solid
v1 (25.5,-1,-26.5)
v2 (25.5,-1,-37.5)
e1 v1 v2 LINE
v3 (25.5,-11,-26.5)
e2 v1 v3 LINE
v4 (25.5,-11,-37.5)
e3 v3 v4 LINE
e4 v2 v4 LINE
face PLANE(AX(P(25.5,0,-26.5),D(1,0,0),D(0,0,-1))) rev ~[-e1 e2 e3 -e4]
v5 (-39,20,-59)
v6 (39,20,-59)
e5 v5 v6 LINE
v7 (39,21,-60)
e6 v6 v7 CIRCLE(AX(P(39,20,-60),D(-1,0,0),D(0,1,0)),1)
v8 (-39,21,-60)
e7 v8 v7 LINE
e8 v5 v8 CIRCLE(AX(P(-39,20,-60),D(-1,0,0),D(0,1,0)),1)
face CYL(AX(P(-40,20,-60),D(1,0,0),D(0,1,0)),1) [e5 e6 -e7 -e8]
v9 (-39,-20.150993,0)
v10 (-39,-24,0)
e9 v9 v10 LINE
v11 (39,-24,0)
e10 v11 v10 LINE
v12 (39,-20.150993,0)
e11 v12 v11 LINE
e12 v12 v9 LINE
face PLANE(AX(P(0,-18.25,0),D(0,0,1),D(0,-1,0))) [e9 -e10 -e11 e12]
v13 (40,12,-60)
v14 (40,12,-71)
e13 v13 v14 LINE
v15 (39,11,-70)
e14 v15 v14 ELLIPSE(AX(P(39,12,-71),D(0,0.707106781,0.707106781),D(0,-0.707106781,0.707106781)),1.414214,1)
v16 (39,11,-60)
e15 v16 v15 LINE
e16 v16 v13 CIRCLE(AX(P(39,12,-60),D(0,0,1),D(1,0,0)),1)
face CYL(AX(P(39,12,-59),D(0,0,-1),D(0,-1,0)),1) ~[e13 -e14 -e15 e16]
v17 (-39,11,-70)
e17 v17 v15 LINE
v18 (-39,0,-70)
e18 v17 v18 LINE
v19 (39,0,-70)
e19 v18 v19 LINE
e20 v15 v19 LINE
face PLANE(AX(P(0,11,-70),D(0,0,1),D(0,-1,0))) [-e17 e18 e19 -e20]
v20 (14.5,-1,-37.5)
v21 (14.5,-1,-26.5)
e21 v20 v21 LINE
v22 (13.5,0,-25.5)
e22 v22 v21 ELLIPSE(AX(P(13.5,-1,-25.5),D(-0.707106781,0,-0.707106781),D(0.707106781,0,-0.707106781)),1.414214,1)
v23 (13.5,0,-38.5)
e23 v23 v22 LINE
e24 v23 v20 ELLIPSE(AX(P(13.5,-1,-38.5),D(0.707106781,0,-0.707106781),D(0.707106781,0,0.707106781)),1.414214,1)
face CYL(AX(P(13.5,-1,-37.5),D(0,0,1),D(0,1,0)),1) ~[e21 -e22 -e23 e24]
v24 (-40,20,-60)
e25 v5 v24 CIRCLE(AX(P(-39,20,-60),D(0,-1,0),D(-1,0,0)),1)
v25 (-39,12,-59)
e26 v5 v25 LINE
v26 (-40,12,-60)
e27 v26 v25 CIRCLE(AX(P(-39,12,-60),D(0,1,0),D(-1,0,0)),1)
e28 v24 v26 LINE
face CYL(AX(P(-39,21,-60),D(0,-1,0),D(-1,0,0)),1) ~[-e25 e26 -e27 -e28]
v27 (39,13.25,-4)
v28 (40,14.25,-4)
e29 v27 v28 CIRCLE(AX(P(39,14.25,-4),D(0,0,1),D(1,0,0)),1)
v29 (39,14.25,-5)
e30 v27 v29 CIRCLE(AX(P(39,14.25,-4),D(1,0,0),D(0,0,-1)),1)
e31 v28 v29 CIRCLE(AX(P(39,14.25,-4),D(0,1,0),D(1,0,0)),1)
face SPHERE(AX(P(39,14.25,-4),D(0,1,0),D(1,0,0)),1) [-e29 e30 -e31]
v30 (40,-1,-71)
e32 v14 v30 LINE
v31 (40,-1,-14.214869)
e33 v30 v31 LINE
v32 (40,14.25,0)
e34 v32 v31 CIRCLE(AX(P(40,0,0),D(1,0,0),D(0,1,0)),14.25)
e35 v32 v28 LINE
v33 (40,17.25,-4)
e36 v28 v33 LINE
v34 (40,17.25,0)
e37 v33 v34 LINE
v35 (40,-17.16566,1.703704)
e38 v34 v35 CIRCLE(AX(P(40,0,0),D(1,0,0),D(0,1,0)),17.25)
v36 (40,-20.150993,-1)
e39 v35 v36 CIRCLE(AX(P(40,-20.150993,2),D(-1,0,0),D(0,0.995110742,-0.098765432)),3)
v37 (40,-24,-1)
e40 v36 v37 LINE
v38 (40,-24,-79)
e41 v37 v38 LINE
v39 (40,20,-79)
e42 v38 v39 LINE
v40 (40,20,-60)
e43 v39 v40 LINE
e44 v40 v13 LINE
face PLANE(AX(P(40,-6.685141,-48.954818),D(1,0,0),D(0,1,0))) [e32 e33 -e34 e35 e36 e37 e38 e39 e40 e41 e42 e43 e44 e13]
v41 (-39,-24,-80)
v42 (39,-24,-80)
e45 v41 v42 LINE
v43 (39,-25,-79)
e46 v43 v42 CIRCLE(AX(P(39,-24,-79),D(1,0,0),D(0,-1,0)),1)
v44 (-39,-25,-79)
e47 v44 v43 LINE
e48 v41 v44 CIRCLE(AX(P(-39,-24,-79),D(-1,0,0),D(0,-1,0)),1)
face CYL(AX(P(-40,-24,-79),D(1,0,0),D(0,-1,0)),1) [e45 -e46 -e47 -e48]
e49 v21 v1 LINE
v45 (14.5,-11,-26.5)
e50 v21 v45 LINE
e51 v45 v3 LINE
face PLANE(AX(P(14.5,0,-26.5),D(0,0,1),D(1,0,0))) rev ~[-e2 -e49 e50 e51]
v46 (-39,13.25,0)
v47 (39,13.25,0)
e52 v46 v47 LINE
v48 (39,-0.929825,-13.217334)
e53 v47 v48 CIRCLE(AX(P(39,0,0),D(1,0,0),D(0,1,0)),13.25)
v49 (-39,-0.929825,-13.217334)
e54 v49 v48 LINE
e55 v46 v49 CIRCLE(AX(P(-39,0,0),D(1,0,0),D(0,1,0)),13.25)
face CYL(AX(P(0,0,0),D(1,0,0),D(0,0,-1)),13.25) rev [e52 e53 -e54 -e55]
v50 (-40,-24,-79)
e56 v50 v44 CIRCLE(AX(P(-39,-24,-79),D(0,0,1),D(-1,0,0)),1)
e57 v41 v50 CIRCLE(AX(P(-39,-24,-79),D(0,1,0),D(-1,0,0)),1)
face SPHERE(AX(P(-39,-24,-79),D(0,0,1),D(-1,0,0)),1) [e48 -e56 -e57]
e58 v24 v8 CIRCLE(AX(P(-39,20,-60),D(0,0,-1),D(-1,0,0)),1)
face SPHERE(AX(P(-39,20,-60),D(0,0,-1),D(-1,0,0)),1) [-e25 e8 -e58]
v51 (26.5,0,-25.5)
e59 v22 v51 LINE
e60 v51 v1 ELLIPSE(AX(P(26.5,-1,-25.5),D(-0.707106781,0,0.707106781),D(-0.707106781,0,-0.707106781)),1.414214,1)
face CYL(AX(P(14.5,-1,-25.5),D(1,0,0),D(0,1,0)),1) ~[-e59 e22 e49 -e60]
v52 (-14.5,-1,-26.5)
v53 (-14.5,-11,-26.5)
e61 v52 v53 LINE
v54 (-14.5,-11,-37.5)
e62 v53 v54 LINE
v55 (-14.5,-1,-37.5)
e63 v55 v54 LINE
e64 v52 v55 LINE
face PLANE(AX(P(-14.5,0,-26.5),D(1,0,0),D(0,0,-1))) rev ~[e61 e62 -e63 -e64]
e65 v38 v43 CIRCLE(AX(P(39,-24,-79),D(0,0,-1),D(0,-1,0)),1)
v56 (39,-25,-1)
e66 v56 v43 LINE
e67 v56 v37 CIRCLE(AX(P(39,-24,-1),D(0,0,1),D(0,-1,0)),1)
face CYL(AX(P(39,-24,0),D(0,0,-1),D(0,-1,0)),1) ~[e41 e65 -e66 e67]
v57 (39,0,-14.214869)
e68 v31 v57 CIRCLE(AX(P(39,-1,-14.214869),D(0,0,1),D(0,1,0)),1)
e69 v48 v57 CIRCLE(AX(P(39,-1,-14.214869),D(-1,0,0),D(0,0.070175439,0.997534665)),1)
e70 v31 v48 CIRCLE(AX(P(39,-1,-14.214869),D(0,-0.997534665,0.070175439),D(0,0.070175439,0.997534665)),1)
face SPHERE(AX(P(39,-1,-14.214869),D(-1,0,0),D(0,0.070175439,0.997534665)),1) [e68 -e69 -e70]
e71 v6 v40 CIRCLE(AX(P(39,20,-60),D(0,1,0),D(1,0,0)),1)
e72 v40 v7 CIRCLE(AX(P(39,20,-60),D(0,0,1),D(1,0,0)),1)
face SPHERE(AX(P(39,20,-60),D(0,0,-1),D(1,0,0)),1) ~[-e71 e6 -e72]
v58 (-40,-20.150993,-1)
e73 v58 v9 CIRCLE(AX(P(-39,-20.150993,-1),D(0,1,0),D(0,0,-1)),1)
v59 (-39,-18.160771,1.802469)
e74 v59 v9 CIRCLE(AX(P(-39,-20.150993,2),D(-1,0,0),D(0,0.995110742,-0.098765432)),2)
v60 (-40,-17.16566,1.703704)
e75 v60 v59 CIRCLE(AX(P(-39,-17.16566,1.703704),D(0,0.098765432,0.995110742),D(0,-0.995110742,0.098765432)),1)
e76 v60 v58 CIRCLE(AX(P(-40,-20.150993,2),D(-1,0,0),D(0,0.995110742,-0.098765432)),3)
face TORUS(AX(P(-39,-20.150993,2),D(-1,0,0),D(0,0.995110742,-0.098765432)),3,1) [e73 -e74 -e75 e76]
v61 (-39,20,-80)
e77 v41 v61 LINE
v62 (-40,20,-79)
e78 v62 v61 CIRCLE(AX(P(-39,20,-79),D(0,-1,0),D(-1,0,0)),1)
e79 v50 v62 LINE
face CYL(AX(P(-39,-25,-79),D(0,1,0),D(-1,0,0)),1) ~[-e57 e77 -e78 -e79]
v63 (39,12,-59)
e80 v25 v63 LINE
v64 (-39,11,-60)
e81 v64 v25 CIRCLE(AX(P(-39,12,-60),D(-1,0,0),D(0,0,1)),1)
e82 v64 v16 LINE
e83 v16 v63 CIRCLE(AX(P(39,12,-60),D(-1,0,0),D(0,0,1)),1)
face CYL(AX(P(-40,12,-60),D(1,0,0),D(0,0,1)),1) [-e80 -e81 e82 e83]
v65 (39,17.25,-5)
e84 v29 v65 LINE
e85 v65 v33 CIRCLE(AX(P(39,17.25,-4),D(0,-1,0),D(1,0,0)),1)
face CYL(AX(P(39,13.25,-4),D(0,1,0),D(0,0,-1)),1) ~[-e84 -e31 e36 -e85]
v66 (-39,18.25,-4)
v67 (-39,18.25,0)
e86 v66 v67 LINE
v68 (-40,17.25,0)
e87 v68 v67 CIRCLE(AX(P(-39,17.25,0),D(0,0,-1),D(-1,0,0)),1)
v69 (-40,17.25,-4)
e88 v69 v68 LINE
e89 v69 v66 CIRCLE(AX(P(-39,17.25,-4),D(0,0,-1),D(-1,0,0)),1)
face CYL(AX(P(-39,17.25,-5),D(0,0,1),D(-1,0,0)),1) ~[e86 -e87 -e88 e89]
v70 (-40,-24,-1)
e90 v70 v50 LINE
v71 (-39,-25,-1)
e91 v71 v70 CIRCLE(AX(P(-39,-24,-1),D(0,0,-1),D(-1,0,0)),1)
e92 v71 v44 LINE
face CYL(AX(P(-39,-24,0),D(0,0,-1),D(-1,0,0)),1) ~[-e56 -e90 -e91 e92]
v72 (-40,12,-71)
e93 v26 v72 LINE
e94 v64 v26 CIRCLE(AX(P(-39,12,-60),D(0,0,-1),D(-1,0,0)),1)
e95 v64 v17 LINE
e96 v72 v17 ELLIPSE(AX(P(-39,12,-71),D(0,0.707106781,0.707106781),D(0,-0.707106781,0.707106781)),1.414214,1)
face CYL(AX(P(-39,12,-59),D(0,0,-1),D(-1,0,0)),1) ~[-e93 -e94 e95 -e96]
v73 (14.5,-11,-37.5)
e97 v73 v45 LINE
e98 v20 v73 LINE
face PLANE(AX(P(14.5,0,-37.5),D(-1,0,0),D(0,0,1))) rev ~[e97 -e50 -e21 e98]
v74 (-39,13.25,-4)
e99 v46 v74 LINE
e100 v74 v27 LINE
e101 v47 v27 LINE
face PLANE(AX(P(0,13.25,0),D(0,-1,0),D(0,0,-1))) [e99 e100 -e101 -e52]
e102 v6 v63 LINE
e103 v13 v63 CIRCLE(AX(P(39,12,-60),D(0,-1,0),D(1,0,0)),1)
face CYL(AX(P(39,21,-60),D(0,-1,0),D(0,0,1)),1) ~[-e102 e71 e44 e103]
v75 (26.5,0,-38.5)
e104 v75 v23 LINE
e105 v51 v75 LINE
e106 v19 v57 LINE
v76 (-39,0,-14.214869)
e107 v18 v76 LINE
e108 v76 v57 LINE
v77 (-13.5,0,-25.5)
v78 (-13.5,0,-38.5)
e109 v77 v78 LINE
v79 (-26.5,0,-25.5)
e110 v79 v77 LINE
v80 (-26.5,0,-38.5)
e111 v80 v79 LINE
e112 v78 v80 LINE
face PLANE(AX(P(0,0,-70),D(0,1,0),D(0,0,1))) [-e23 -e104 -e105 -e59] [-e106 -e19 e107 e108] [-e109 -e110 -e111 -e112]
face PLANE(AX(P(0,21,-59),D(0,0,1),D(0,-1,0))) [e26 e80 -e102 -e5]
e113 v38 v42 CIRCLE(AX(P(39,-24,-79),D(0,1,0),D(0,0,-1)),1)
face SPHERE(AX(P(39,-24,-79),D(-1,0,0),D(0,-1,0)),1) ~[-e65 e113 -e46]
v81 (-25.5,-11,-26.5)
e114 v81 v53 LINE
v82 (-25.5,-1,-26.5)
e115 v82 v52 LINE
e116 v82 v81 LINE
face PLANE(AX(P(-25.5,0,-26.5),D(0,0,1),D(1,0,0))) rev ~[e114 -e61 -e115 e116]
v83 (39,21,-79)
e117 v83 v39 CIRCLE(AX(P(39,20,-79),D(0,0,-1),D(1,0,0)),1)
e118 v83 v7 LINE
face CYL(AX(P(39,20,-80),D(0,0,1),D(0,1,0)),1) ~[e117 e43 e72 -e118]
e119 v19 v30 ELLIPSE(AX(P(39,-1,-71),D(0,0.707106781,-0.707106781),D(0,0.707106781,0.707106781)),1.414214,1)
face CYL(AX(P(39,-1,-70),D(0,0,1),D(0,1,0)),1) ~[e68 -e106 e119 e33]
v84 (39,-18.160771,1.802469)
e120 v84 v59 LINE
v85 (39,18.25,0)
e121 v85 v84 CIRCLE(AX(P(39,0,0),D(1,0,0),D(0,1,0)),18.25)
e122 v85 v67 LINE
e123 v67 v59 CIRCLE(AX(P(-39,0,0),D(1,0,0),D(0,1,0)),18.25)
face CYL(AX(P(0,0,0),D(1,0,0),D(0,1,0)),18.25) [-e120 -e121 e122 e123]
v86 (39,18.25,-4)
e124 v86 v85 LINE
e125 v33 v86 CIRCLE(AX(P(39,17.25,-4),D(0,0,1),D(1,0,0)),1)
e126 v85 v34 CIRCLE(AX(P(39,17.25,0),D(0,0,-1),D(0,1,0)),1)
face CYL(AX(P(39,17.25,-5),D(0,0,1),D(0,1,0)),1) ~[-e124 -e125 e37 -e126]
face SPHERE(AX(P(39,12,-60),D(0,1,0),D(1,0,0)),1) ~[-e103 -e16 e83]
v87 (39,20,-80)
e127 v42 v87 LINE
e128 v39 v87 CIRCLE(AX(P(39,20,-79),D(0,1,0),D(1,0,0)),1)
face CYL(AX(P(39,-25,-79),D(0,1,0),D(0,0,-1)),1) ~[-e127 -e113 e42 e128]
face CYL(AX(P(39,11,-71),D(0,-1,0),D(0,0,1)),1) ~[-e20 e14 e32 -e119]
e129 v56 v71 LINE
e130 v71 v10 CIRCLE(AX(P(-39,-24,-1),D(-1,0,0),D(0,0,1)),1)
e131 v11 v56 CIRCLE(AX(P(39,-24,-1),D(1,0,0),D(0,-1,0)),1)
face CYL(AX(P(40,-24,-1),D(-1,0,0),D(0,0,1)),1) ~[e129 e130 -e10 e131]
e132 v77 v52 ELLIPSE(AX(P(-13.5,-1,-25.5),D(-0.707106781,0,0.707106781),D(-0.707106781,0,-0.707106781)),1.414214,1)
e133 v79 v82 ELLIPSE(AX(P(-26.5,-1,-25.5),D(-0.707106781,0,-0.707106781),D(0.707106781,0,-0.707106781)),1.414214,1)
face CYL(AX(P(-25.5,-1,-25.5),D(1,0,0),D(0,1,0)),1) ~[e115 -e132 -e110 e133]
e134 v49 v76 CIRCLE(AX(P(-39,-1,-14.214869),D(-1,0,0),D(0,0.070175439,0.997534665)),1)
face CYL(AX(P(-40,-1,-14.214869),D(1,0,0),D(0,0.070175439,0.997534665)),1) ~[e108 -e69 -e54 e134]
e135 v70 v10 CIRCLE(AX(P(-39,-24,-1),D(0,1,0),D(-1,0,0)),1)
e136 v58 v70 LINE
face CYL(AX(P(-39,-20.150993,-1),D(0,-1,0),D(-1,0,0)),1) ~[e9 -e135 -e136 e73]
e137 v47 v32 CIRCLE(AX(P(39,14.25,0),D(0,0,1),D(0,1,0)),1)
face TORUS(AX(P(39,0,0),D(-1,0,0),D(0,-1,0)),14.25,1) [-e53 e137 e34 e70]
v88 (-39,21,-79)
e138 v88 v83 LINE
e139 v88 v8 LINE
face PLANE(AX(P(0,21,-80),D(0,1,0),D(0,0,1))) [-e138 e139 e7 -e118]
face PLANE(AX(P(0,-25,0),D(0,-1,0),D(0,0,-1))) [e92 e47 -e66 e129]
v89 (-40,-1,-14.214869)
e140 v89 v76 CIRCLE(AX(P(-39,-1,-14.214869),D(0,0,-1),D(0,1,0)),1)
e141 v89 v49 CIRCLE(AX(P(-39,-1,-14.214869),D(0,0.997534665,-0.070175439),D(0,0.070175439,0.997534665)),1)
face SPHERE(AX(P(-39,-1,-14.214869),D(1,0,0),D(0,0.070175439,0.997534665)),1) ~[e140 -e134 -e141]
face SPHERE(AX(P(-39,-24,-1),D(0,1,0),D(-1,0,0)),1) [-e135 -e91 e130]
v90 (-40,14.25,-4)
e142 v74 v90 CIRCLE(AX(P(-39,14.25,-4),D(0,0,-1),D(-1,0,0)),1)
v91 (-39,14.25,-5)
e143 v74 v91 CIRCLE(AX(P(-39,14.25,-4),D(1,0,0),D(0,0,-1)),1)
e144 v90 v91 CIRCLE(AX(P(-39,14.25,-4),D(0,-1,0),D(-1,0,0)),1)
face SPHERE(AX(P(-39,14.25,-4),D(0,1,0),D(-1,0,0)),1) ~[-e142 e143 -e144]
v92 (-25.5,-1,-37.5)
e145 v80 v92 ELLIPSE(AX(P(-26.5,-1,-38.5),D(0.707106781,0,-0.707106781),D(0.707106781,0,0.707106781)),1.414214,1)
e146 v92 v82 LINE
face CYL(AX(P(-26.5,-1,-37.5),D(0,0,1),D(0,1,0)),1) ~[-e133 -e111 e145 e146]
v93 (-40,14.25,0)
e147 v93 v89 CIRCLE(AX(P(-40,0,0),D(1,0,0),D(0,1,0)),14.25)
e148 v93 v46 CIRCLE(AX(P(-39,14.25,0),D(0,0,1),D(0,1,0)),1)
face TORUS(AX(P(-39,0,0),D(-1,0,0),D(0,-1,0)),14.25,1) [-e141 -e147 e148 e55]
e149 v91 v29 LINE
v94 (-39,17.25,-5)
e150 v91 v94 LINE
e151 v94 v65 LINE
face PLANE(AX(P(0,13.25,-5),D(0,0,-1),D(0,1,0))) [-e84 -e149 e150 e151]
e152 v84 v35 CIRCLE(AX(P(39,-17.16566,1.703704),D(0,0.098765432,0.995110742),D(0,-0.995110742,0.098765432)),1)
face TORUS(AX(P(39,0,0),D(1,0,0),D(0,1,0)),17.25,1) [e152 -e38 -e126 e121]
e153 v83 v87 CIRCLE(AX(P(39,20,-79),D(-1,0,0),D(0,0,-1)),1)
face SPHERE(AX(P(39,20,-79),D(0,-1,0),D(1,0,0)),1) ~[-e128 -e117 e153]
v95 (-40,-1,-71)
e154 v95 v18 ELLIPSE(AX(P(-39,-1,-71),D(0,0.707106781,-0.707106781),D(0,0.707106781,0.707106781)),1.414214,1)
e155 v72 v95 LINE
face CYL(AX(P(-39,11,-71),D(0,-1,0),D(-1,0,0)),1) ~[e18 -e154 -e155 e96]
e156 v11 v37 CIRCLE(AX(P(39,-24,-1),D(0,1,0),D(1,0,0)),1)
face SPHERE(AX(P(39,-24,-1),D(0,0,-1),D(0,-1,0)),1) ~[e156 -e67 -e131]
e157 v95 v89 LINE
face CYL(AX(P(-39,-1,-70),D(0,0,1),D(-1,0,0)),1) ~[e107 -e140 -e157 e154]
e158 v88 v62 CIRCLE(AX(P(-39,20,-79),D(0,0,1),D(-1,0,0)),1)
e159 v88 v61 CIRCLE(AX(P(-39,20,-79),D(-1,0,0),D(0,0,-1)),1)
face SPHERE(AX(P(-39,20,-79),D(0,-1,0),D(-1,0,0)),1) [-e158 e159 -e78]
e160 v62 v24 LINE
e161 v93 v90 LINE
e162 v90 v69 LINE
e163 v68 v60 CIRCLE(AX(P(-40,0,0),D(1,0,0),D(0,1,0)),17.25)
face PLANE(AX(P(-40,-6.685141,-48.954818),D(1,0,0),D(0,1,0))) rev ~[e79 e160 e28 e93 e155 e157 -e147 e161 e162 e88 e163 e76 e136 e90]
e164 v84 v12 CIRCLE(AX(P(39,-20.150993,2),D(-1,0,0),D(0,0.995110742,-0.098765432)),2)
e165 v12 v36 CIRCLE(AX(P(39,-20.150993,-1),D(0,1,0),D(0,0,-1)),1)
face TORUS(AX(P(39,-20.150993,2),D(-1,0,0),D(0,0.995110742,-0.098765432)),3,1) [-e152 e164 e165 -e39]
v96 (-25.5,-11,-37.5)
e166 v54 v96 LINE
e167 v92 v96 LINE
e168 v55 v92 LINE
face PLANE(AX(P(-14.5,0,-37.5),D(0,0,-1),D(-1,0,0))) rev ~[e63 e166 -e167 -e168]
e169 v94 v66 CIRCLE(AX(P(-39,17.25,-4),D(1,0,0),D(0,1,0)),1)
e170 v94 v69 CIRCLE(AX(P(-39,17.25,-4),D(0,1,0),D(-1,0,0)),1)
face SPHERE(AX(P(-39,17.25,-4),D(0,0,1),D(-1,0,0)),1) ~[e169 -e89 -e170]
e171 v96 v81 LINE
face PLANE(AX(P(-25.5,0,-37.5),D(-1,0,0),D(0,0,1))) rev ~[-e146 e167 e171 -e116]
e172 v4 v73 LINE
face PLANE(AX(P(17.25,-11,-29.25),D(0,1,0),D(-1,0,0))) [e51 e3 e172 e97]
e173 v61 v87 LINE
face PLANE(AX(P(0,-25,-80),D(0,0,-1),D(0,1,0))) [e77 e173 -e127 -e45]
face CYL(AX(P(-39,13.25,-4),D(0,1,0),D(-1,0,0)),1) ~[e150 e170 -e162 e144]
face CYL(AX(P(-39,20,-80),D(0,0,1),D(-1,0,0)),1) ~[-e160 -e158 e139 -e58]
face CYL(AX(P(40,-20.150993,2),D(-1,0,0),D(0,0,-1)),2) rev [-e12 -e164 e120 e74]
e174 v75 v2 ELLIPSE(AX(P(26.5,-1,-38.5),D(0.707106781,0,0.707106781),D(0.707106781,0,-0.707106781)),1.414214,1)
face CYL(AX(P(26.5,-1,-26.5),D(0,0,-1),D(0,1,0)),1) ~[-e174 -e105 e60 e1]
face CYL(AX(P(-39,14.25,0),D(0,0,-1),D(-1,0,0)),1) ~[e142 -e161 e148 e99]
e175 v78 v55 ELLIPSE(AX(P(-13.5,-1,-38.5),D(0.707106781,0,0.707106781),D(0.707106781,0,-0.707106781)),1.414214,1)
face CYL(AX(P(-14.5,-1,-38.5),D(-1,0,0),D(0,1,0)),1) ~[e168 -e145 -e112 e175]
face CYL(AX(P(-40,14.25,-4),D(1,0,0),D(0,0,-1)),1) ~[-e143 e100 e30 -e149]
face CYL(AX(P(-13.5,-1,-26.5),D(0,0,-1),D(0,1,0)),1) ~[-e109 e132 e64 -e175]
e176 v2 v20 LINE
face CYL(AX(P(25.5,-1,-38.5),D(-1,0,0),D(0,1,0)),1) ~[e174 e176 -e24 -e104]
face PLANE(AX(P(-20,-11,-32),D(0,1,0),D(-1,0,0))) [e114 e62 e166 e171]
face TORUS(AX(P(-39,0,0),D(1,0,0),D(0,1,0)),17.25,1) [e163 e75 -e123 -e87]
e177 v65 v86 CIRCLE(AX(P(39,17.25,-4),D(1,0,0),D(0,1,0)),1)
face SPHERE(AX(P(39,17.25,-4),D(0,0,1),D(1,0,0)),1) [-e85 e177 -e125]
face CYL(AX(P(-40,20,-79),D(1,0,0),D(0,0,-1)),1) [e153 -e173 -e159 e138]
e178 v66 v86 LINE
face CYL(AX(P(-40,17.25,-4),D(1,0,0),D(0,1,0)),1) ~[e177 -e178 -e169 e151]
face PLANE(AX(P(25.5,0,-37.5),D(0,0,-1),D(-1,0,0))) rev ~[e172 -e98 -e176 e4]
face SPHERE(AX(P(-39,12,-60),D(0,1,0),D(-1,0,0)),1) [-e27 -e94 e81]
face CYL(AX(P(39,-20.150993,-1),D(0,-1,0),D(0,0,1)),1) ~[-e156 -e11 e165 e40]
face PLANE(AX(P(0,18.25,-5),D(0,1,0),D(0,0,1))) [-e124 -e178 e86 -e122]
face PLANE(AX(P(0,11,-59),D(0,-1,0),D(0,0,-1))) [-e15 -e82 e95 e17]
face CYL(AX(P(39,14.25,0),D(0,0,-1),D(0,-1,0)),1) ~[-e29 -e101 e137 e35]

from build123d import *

# Parameters (mm, degrees)
F1_DEPTH = 40
F2_W     = 5.5
F2_H     = 5.5
F3_DEPTH = 11
F4_R     = 2
F5_R     = 1


# Not quite as in the source:
# - a feature names something its author has since deleted; it is built from what else it names


with BuildPart() as f1:
    # F0 (on Right) → F1 (new body, symmetric)
    with BuildSketch(Plane.YZ):
        with BuildLine():
            ThreePointArc((0, -18.25), (-12.9046987567, -12.9046987567), (-18.25, 0))
            Line((-18.25, 0), (-25, 0))
            Line((-25, 0), (-25, -80))
            Line((-25, -80), (21, -80))
            Line((21, -80), (21, -59))
            Line((21, -59), (11, -59))
            Line((11, -59), (11, -70))
            Line((11, -70), (0, -70))
            Line((0, -70), (0, -18.25))
        make_face()
        with BuildLine():
            Line((-13.25, 0), (-18.25, 0))
            ThreePointArc((-18.25, 0), (-12.9046987567, -12.9046987567), (0, -18.25))
            Line((0, -18.25), (0, -13.25))
            ThreePointArc((0, -13.25), (-9.3691648507, -9.3691648507), (-13.25, 0))
        make_face()
        with BuildLine():
            ThreePointArc((17.5517093185, -5), (18.0745842976, -2.5242627575), (18.25, 0))
            Line((18.25, 0), (13.25, 0))
            Line((13.25, 0), (13.25, -5))
            Line((13.25, -5), (17.5517093185, -5))
        make_face()
        with BuildLine():
            Line((18.25, -5), (18.25, 0))
            ThreePointArc((18.25, 0), (18.0745842976, -2.5242627575), (17.5517093185, -5))
            Line((17.5517093185, -5), (18.25, -5))
        make_face()
        with BuildLine():
            Line((13.25, 0), (18.25, 0))
            ThreePointArc((18.25, 0), (0, 18.25), (-18.25, 0))
            Line((-18.25, 0), (-13.25, 0))
            ThreePointArc((-13.25, 0), (0, 13.25), (13.25, 0))
        make_face()
    extrude(amount=F1_DEPTH, both=True)

    # F2 (on face) → F3 (cut)
    with BuildSketch(Plane(origin=(0, 0, 0), x_dir=(-1, 0, 0), z_dir=(0, 1, 0))):
        with Locations((-17.25, -29.25)):
            Rectangle(F2_W, F2_H)
        with Locations((-22.75, -29.25)):
            Rectangle(F2_W, F2_H)
        Polygon((-14.5, -32), (-20, -32), (-25.5, -32), (-25.5, -37.5), (-20, -37.5), (-14.5, -37.5), align=None)
        Polygon((25.5, -26.5), (20, -26.5), (14.5, -26.5), (14.5, -32), (14.5, -37.5), (20, -37.5), (25.5, -37.5), (25.5, -32), align=None)
    extrude(amount=-F3_DEPTH, mode=Mode.SUBTRACT)

    # F4
    f4_edges = [f1.edges().sort_by_distance(p)[0] for p in [
        (0, -18.25, 0),
    ]]
    fillet(f4_edges, radius=F4_R)

    # F5
    f5_edges = [f1.edges().sort_by_distance(p)[0] for p in [
        (-40, 0.902338, 18.227679),
        (-40, -18.808432, 0.517593),
        (-40, 18.25, -2.5),
        (-40, -22.575496, 0),
        (-40, 15.75, -5),
        (-40, -25, -40),
        (-40, 13.25, -2.5),
        (-40, -2, -80),
        (-40, -9.369165, 9.369165),
        (-40, 21, -69.5),
        (-40, 0, -41.625),
        (-40, 16, -59),
        (-40, 5.5, -70),
        (-40, 11, -64.5),
        (0, -25, -80),
        (40, -25, -40),
        (0, -25, 0),
        (40, 0.902338, 18.227679),
        (40, -18.808432, 0.517593),
        (40, 18.25, -2.5),
        (40, -22.575496, 0),
        (40, 15.75, -5),
        (40, 13.25, -2.5),
        (40, -2, -80),
        (40, -9.369165, 9.369165),
        (40, 21, -69.5),
        (40, 0, -41.625),
        (40, 16, -59),
        (40, 5.5, -70),
        (40, 11, -64.5),
        (0, 21, -80),
        (0, 21, -59),
        (0, 11, -59),
        (0, 18.25, -5),
        (0, 13.25, -5),
        (0, 0, -13.25),
        (25.5, 0, -32),
        (20, 0, -26.5),
        (14.5, 0, -32),
        (20, 0, -37.5),
        (-14.5, 0, -32),
        (-20, 0, -26.5),
        (-25.5, 0, -32),
        (-20, 0, -37.5),
    ]]
    fillet(f5_edges, radius=F5_R)


solid = f1.part
